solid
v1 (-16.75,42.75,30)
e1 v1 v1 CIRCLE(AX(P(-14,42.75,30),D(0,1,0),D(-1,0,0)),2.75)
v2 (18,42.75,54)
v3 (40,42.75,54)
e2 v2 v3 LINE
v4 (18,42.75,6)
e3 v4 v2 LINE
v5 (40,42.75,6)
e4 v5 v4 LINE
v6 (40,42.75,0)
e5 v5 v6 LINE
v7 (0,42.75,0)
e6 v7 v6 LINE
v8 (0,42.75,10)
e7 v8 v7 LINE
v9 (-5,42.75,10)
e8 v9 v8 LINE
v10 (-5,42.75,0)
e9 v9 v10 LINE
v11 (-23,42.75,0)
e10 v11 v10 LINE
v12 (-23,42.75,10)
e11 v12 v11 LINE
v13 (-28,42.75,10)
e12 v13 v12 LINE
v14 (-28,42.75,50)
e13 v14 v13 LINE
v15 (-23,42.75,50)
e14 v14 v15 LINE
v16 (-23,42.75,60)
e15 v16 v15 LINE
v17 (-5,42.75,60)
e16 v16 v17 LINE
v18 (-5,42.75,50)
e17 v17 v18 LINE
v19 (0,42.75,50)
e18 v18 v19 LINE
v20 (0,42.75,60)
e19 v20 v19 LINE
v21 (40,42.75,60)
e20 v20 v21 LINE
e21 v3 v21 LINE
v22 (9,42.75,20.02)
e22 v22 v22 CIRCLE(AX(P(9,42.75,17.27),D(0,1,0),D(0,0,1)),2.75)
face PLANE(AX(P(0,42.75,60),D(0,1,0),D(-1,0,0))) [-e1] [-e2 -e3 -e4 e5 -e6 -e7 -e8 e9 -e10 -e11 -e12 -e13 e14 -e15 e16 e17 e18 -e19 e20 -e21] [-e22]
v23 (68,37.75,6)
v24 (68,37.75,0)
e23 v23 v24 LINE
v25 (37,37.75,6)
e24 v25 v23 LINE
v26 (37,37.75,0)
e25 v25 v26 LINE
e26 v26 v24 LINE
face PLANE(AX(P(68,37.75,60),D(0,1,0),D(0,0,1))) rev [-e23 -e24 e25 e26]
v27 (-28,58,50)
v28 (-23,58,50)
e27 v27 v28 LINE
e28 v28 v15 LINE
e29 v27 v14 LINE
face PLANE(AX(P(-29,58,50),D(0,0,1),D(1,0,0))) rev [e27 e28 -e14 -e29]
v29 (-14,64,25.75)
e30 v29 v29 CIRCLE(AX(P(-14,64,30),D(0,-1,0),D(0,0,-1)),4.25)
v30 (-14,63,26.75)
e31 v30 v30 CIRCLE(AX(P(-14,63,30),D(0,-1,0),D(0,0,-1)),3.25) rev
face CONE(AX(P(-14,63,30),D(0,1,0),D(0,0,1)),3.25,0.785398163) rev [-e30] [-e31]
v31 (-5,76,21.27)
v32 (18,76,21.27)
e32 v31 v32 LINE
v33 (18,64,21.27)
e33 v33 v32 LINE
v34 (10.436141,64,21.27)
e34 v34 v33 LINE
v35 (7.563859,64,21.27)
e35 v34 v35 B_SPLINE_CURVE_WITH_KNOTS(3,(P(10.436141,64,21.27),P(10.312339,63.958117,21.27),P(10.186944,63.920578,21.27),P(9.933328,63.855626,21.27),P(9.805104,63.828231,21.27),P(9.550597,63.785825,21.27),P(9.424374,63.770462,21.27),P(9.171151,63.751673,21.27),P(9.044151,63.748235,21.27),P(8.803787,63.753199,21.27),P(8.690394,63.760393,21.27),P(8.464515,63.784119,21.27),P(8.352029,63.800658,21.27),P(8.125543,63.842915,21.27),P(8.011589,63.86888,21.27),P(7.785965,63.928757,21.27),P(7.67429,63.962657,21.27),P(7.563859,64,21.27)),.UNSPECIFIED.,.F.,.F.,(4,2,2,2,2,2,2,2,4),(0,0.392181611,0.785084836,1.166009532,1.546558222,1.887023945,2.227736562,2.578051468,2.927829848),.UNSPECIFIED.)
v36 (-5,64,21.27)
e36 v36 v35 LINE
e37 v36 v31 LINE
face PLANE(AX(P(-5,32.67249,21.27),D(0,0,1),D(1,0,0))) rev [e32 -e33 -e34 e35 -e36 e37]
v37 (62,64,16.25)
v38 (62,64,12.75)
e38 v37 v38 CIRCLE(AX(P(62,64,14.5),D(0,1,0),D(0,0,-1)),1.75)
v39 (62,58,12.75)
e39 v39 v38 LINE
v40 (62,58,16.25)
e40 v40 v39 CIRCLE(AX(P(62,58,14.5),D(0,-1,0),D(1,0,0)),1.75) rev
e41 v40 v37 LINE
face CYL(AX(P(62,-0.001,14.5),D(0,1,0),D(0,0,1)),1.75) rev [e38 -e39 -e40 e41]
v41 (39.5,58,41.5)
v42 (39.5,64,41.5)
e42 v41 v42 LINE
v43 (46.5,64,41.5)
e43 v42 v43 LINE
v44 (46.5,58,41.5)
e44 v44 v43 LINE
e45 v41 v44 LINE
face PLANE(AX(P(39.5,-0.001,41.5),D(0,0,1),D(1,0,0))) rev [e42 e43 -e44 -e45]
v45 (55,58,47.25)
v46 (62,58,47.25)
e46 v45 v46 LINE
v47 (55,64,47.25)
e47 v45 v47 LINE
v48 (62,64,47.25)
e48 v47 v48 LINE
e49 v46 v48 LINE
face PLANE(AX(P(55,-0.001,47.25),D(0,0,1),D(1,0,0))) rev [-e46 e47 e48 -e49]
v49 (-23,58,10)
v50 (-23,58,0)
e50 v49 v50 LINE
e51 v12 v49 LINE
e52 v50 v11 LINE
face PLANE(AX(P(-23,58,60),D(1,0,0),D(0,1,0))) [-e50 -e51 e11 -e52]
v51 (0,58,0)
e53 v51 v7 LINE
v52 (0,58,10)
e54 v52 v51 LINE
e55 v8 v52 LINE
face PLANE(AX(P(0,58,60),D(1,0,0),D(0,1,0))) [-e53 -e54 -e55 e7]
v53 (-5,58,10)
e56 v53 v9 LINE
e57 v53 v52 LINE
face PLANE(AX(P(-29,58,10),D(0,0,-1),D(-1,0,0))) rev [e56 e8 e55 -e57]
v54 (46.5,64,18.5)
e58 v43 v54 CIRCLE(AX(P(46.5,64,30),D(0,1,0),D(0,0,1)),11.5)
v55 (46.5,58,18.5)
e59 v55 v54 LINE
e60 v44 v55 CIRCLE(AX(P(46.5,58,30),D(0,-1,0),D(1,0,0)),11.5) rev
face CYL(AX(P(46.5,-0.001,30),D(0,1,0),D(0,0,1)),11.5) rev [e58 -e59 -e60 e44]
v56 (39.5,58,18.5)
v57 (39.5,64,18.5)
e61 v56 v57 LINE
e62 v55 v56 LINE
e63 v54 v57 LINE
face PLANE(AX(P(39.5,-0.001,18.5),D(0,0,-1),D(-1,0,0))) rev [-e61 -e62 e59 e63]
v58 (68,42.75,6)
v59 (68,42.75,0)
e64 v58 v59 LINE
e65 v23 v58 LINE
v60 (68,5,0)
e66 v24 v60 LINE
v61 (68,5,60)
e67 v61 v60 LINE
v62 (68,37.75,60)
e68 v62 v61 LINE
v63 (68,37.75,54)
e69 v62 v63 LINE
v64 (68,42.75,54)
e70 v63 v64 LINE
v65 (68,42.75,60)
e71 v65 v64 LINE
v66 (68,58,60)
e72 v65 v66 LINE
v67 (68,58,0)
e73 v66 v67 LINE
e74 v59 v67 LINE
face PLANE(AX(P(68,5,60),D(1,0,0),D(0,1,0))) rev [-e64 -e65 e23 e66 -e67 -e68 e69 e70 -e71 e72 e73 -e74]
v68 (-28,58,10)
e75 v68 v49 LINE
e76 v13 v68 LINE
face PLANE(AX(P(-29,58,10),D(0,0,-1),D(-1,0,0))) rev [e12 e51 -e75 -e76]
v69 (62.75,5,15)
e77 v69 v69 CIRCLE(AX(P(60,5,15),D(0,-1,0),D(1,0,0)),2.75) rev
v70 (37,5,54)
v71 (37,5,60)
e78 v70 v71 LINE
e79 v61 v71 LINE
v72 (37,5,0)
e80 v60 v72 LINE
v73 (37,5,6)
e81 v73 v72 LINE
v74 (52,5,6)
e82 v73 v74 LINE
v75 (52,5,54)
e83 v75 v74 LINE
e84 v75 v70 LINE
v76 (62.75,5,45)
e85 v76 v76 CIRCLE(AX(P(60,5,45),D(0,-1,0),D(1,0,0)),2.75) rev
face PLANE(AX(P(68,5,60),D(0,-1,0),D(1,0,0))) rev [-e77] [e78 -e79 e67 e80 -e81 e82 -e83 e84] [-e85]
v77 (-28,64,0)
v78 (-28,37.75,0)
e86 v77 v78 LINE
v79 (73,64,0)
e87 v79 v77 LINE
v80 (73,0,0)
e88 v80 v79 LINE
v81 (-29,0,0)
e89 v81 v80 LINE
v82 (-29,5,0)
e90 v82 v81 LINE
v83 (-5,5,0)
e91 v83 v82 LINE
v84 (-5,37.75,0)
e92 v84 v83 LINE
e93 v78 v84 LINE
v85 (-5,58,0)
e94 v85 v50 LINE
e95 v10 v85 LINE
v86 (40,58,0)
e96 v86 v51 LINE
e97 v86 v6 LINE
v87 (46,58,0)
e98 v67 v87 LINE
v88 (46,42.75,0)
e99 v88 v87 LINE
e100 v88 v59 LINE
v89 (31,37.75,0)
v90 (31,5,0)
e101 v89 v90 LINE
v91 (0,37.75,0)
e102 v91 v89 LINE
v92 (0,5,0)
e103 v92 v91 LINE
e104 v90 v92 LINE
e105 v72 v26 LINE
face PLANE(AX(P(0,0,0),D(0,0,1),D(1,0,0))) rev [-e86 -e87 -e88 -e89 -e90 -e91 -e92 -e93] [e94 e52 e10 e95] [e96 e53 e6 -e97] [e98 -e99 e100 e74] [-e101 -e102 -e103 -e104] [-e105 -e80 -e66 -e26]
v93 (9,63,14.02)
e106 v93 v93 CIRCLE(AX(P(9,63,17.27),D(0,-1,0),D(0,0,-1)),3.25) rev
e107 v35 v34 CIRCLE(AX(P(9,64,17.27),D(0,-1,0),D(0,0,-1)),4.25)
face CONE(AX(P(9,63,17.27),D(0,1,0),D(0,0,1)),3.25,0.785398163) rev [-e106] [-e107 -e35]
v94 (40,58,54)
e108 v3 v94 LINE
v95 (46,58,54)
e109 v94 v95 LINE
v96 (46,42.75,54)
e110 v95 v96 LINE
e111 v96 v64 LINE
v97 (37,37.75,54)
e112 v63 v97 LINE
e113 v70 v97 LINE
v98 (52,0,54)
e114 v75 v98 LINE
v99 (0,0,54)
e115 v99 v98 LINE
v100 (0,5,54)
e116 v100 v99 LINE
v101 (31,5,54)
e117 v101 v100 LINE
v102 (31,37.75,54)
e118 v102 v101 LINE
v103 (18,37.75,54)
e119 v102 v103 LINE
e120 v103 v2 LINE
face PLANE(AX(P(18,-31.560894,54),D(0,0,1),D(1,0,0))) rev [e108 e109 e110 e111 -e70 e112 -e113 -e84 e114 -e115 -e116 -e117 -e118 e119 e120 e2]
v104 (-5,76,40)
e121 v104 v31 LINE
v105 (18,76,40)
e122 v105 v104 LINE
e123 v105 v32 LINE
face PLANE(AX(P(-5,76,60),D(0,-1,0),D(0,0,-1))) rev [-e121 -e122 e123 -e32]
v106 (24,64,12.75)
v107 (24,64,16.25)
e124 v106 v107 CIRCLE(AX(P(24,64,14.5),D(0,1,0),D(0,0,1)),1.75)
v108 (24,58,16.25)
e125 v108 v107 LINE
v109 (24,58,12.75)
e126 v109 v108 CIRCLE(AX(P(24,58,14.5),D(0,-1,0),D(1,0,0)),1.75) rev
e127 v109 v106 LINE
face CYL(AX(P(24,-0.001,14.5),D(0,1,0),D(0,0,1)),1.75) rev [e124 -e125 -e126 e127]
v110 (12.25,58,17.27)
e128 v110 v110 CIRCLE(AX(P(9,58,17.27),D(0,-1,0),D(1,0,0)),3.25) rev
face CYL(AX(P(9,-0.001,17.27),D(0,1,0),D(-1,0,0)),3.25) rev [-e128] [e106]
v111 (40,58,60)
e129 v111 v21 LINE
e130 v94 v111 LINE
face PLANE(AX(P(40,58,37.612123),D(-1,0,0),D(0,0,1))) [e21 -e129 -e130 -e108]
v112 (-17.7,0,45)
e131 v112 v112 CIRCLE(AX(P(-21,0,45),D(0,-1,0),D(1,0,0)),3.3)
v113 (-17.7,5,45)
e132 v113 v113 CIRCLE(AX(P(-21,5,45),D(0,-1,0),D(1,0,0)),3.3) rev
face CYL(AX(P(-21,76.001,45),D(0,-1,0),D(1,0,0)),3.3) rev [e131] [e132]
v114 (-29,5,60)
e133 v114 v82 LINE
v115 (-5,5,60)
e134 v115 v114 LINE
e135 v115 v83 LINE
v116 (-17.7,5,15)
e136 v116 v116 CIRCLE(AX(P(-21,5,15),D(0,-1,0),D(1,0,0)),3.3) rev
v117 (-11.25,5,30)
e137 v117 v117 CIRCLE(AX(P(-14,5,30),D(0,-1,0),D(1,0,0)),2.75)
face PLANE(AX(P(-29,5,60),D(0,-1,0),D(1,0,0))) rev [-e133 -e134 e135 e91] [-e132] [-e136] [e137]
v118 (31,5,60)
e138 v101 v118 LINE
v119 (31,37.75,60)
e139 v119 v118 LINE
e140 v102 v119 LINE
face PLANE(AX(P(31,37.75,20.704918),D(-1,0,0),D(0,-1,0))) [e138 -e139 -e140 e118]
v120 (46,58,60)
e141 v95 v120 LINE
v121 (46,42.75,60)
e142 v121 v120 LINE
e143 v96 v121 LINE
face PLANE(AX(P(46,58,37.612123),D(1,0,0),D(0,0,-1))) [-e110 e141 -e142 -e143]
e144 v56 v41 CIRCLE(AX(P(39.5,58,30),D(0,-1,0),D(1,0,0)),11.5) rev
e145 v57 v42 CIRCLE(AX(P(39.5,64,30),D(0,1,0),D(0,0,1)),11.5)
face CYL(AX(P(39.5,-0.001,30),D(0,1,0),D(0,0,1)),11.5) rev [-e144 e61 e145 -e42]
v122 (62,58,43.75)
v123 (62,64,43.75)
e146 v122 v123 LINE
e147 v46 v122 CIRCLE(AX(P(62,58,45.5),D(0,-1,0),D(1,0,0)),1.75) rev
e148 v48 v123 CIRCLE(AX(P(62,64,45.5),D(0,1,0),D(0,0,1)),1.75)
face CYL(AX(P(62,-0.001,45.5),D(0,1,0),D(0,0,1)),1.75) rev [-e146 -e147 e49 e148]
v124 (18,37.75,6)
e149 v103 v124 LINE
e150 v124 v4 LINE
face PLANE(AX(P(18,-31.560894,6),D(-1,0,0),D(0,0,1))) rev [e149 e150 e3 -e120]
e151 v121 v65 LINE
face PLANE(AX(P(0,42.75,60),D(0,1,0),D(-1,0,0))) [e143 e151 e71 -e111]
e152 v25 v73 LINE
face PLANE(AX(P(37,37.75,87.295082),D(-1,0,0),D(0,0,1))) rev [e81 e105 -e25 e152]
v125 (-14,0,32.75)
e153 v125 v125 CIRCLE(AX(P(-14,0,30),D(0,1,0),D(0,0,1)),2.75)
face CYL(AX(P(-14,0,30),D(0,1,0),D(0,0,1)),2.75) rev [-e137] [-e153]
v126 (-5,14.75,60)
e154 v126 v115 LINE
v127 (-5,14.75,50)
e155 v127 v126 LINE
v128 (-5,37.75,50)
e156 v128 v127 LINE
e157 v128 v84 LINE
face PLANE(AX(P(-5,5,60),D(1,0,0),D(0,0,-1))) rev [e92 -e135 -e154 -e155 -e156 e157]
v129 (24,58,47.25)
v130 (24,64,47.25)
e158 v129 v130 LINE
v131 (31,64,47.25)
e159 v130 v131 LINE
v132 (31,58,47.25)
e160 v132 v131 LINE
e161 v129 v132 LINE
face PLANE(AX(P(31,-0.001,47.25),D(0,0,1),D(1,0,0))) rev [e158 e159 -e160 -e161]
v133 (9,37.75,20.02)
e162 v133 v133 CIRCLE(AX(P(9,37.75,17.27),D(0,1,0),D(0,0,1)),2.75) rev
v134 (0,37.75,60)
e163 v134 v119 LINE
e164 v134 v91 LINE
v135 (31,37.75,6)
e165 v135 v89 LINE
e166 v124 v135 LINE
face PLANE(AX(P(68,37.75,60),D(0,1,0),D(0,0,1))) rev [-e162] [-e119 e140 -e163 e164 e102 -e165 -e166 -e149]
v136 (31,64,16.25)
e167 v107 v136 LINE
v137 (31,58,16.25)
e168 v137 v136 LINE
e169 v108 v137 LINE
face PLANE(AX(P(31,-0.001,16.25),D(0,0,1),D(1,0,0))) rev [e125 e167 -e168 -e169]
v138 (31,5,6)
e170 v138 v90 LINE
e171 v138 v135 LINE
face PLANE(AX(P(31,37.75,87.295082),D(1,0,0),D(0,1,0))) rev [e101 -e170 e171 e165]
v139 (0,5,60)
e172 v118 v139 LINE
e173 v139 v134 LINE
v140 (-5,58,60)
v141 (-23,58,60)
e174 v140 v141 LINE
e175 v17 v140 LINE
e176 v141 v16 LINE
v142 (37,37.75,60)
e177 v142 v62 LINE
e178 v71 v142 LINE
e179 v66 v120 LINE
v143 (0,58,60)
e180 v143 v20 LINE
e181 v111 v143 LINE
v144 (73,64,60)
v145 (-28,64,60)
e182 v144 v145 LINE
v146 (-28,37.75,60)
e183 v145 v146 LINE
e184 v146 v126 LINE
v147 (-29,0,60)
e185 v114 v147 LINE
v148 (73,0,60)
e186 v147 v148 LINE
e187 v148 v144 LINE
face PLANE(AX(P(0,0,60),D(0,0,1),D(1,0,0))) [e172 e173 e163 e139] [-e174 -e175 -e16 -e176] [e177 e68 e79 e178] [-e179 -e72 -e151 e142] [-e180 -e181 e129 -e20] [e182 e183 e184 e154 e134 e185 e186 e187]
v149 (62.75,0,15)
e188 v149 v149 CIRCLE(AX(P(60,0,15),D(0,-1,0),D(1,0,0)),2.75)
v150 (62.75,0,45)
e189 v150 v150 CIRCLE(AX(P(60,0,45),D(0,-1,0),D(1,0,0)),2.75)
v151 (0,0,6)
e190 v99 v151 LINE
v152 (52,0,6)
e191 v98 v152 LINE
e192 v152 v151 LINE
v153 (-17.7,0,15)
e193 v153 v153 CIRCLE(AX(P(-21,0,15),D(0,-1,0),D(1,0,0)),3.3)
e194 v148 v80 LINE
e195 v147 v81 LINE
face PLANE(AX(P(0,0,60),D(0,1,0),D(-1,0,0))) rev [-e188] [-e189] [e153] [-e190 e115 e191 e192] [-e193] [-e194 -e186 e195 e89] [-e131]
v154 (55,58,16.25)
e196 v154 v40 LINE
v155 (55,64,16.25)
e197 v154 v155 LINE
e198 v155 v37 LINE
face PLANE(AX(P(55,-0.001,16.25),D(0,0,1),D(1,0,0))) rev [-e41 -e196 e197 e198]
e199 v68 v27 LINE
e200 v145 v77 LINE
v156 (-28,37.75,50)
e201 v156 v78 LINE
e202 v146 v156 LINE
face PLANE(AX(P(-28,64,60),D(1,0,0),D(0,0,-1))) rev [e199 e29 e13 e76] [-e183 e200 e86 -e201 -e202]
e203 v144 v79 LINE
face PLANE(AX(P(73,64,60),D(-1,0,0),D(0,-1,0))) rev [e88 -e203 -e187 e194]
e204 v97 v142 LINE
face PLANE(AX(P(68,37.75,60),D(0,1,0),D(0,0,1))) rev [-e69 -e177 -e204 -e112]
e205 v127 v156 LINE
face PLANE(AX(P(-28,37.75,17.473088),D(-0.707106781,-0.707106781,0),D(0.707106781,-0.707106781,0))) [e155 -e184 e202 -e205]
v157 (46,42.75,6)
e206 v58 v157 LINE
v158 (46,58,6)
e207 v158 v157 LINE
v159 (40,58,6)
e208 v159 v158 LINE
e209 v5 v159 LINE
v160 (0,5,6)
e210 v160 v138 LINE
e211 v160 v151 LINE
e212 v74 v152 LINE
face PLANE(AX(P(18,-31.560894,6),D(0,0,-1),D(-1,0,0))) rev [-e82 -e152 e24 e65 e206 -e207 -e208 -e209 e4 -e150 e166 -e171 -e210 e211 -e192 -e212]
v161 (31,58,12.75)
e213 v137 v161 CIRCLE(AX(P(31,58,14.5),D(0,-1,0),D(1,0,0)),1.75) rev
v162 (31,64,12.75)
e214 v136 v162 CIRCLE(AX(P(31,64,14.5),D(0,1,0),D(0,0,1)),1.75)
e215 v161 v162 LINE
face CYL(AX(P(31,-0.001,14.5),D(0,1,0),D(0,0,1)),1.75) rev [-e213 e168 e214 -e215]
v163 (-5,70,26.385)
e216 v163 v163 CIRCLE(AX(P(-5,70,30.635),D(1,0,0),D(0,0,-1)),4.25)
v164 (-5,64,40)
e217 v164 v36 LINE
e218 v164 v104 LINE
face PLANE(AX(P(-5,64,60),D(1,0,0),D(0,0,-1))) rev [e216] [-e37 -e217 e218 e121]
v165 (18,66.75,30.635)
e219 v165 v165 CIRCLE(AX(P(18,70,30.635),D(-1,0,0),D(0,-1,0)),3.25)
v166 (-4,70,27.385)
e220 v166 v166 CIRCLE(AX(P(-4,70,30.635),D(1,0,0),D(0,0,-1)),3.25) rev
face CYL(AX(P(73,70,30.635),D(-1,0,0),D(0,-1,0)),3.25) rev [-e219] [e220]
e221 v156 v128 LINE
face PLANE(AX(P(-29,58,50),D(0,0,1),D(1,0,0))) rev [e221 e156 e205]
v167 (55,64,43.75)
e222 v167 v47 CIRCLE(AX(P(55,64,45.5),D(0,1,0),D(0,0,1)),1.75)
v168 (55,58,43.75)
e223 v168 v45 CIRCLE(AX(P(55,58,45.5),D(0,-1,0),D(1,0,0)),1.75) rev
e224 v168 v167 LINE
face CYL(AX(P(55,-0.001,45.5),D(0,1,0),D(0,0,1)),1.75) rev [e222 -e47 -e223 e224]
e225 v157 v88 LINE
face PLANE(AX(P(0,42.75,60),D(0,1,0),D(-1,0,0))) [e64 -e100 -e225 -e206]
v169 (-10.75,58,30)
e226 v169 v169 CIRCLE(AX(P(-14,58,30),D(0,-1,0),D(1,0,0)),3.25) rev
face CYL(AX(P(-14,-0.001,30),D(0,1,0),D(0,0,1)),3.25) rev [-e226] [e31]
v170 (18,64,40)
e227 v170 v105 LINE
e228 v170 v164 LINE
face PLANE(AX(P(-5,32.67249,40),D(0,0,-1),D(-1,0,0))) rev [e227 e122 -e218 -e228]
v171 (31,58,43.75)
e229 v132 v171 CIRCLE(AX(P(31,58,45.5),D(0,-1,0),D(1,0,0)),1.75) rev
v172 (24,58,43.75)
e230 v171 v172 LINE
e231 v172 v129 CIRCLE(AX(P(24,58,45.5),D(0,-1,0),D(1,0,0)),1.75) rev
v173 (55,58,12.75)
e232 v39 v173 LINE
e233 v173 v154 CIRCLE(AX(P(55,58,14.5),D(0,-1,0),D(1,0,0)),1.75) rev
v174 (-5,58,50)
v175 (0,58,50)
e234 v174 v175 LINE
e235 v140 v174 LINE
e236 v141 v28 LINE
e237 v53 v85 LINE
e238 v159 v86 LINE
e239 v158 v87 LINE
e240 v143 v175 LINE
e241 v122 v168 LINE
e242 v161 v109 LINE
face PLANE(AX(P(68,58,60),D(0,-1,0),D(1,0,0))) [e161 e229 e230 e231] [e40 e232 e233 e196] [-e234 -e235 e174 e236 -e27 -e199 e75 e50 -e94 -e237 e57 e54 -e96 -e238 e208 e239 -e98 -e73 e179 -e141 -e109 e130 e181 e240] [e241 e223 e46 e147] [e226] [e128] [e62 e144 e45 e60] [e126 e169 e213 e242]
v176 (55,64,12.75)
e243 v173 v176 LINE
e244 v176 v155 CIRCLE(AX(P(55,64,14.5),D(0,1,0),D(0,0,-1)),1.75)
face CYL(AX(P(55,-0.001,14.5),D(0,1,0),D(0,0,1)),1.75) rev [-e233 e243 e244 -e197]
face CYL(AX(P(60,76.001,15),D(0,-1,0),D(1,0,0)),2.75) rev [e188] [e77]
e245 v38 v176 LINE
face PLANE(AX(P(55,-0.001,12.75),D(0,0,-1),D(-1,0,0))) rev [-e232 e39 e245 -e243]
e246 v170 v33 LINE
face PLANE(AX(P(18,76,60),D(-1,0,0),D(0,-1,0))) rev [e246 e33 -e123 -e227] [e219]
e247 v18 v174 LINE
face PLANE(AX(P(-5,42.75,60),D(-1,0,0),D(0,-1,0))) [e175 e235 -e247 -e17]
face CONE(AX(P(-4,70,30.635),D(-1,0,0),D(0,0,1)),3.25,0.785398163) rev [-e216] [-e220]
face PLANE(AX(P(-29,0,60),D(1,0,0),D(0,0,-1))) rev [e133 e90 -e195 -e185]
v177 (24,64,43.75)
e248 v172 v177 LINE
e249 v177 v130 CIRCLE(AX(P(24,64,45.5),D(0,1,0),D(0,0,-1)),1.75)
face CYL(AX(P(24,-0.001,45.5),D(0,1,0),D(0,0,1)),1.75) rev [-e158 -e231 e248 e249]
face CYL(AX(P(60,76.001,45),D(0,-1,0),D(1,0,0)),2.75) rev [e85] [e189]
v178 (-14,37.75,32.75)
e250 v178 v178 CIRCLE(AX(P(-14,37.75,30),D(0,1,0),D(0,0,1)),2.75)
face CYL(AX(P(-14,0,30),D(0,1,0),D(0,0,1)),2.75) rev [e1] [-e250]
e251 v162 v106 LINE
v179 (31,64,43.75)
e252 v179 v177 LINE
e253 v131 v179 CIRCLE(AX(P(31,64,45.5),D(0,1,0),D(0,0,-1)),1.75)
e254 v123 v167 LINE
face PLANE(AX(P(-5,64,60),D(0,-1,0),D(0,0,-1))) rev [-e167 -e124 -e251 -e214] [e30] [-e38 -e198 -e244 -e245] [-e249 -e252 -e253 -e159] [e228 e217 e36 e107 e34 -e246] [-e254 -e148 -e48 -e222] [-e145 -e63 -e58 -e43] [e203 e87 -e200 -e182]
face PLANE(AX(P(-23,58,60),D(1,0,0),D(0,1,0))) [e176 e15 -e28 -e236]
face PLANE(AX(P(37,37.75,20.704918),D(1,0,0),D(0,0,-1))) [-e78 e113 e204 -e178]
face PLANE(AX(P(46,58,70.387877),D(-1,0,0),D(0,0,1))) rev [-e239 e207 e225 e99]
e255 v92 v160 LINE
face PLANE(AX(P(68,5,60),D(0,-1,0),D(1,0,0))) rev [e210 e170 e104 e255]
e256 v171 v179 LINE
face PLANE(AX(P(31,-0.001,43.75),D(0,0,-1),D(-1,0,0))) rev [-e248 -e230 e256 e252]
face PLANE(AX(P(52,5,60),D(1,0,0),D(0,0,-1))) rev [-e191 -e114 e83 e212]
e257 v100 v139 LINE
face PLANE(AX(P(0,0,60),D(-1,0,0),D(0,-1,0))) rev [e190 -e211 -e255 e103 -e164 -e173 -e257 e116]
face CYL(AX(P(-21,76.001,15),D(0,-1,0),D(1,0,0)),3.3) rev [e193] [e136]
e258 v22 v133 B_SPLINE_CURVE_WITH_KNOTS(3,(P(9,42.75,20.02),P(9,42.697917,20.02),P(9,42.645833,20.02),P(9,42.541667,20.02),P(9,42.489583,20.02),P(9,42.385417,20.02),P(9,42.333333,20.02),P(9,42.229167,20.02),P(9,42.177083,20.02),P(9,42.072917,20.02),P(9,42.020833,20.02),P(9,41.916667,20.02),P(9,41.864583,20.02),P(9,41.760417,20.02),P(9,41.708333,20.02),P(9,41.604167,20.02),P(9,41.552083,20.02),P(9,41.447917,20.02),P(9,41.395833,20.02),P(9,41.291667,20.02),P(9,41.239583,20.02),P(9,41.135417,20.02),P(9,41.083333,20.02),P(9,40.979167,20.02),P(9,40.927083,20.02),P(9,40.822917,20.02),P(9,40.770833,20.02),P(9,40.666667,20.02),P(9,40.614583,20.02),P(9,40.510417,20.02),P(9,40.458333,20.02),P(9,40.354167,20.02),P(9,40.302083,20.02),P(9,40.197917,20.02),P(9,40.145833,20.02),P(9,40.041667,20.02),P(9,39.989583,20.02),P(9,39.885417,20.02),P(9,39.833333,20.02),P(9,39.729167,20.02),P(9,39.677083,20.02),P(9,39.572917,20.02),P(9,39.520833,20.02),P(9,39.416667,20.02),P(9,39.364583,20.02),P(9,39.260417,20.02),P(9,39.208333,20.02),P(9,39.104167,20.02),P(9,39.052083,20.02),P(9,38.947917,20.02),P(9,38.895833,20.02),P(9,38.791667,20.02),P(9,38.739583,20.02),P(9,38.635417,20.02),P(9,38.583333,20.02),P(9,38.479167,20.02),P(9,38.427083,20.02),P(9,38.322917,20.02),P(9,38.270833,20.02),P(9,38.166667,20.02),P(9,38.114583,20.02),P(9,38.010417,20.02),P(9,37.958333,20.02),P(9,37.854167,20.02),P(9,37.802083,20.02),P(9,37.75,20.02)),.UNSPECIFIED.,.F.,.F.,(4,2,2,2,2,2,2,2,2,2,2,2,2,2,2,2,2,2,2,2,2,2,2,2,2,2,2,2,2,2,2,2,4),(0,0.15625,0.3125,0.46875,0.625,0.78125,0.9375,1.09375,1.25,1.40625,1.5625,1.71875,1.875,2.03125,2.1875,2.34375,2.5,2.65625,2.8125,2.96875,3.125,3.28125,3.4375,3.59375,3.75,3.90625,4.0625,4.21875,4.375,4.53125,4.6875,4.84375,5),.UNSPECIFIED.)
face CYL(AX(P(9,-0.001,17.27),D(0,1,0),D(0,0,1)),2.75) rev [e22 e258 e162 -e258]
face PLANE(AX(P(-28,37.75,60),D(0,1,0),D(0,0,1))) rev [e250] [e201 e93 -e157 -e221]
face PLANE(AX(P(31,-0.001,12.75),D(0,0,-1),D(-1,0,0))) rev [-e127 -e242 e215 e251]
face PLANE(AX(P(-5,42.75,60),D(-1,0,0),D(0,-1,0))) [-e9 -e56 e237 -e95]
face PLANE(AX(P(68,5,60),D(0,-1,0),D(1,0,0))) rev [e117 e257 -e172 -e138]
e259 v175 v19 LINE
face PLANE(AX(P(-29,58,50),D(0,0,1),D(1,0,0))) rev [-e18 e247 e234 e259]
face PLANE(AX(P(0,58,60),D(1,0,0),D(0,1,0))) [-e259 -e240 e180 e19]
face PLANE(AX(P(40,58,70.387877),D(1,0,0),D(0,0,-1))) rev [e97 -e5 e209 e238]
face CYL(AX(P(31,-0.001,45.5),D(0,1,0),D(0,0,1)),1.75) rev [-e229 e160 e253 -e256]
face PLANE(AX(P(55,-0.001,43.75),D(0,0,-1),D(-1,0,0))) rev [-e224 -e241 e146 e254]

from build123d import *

# Parameters (mm, degrees)
SKETCH1_W           = 68
SKETCH1_H           = 15.25
SKETCH1_W_2         = 18
BOSS_EXTRUDE1_DEPTH = 60
SKETCH2_W           = 40
SKETCH2_H           = 15.25
CUT_EXTRUDE1_DEPTH  = 122.264174429
CUT_EXTRUDE2_REACH  = 116.127
CUT_EXTRUDE3_REACH  = 123.264
SKETCH5_R           = 3.25
CUT_EXTRUDE4_REACH  = 105.714
SKETCH6_R           = 2.75
SKETCH7_R           = 2.75
CUT_EXTRUDE5_DEPTH  = 115.127122105
CUT_EXTRUDE6_REACH  = 116.127
SKETCH8_R           = 3.25
SKETCH9_W           = 23
SKETCH9_H           = 21.27
SKETCH9_H_2         = 20
CUT_EXTRUDE7_DEPTH  = 12
CHAMFER1_SIZE       = 1
CUT_EXTRUDE8_REACH  = 123.264
SKETCH10_R          = 3.3
SKETCH10_R_2        = 2.75
SKETCH11_R          = 3.25
CUT_EXTRUDE9_DEPTH  = 125.338248339
CHAMFER2_SIZE       = 1
SKETCH12_W          = 50
SKETCH12_H          = 48
CUT_EXTRUDE10_DEPTH = 5
SKETCH13_W          = 52
SKETCH13_H          = 6
BOSS_EXTRUDE2_DEPTH = 5
SKETCH14_W          = 6
SKETCH14_H          = 32.75
BOSS_EXTRUDE3_DEPTH = 6
SKETCH15_W          = 6
SKETCH15_H          = 15.25
BOSS_EXTRUDE4_DEPTH = 6
BOSS_EXTRUDE5_DEPTH = 10


with BuildPart() as part:
    # Sketch1 → Boss-Extrude1 (new body)
    with BuildSketch(Plane.XY):
        Polygon((0, 0), (-29, 0), (-29, 5), (-5, 5), (-5, 37.75), (-28, 37.75), (-28, 64), (-5, 64), (-5, 76), (18, 76), (18, 64), (73, 64), (73, 0), (52, 0), (52, 5), (68, 5), (68, 37.75), (0, 37.75), align=None)
        with Locations((34, 50.375)):
            Rectangle(SKETCH1_W, SKETCH1_H, mode=Mode.SUBTRACT)
        with Locations((-14, 50.375)):
            Rectangle(SKETCH1_W_2, SKETCH1_H, mode=Mode.SUBTRACT)
    extrude(amount=BOSS_EXTRUDE1_DEPTH)

    # Sketch2 → Cut-Extrude1 (cut, through all)
    with BuildSketch(Plane(origin=(0, 0, 0), x_dir=(0, 0, -1), z_dir=(1, 0, 0))):
        with Locations((-30, 50.375)):
            Rectangle(SKETCH2_W, SKETCH2_H)
    extrude(amount=-CUT_EXTRUDE1_DEPTH, mode=Mode.SUBTRACT)

    # Sketch3 → Cut-Extrude2 (cut, up to next)
    with BuildSketch(Plane(origin=(0, 64, 0), x_dir=(1, 0, 0), z_dir=(0, 1, 0)), mode=Mode.PRIVATE) as cut_extrude2_sk1:
        with BuildLine():
            Line((39.5, -18.5), (46.5, -18.5))
            ThreePointArc((46.5, -18.5), (58, -30), (46.5, -41.5))
            Line((46.5, -41.5), (39.5, -41.5))
            ThreePointArc((39.5, -41.5), (28, -30), (39.5, -18.5))
        make_face()
    cut_extrude2_tool1 = extrude(cut_extrude2_sk1.sketch, amount=-CUT_EXTRUDE2_REACH, mode=Mode.PRIVATE) & part.part
    # Sketch3 → Cut-Extrude2 (cut, up to next)
    with BuildSketch(Plane(origin=(0, 64, 0), x_dir=(1, 0, 0), z_dir=(0, 1, 0)), mode=Mode.PRIVATE) as cut_extrude2_sk2:
        with BuildLine():
            Line((31, -16.25), (24, -16.25))
            ThreePointArc((24, -16.25), (22.25, -14.5), (24, -12.75))
            Line((24, -12.75), (31, -12.75))
            ThreePointArc((31, -12.75), (32.75, -14.5), (31, -16.25))
        make_face()
    cut_extrude2_tool2 = extrude(cut_extrude2_sk2.sketch, amount=-CUT_EXTRUDE2_REACH, mode=Mode.PRIVATE) & part.part
    # Sketch3 → Cut-Extrude2 (cut, up to next)
    with BuildSketch(Plane(origin=(0, 64, 0), x_dir=(1, 0, 0), z_dir=(0, 1, 0)), mode=Mode.PRIVATE) as cut_extrude2_sk3:
        with BuildLine():
            Line((55, -16.25), (62, -16.25))
            ThreePointArc((62, -16.25), (63.75, -14.5), (62, -12.75))
            Line((62, -12.75), (55, -12.75))
            ThreePointArc((55, -12.75), (53.25, -14.5), (55, -16.25))
        make_face()
    cut_extrude2_tool3 = extrude(cut_extrude2_sk3.sketch, amount=-CUT_EXTRUDE2_REACH, mode=Mode.PRIVATE) & part.part
    # Sketch3 → Cut-Extrude2 (cut, up to next)
    with BuildSketch(Plane(origin=(0, 64, 0), x_dir=(1, 0, 0), z_dir=(0, 1, 0)), mode=Mode.PRIVATE) as cut_extrude2_sk4:
        with BuildLine():
            Line((31, -43.75), (24, -43.75))
            ThreePointArc((24, -43.75), (22.25, -45.5), (24, -47.25))
            Line((24, -47.25), (31, -47.25))
            ThreePointArc((31, -47.25), (32.75, -45.5), (31, -43.75))
        make_face()
    cut_extrude2_tool4 = extrude(cut_extrude2_sk4.sketch, amount=-CUT_EXTRUDE2_REACH, mode=Mode.PRIVATE) & part.part
    # Sketch3 → Cut-Extrude2 (cut, up to next)
    with BuildSketch(Plane(origin=(0, 64, 0), x_dir=(1, 0, 0), z_dir=(0, 1, 0)), mode=Mode.PRIVATE) as cut_extrude2_sk5:
        with BuildLine():
            Line((55, -43.75), (62, -43.75))
            ThreePointArc((62, -43.75), (63.75, -45.5), (62, -47.25))
            Line((62, -47.25), (55, -47.25))
            ThreePointArc((55, -47.25), (53.25, -45.5), (55, -43.75))
        make_face()
    cut_extrude2_tool5 = extrude(cut_extrude2_sk5.sketch, amount=-CUT_EXTRUDE2_REACH, mode=Mode.PRIVATE) & part.part
    add(cut_extrude2_tool1.solids().sort_by_distance((43, 64, 30))[0], mode=Mode.SUBTRACT)
    add(cut_extrude2_tool2.solids().sort_by_distance((27.5, 64, 14.5))[0], mode=Mode.SUBTRACT)
    add(cut_extrude2_tool3.solids().sort_by_distance((58.5, 64, 14.5))[0], mode=Mode.SUBTRACT)
    add(cut_extrude2_tool4.solids().sort_by_distance((27.5, 64, 45.5))[0], mode=Mode.SUBTRACT)
    add(cut_extrude2_tool5.solids().sort_by_distance((58.5, 64, 45.5))[0], mode=Mode.SUBTRACT)

    # Sketch5 → Cut-Extrude3 (cut, up to next)
    with BuildSketch(Plane(origin=(0, 76, 0), x_dir=(1, 0, 0), z_dir=(0, 1, 0)), mode=Mode.PRIVATE) as cut_extrude3_sk1:
        with Locations(Location((9, -17.27, 0), (0, 0, 180))):
            Circle(SKETCH5_R)
    cut_extrude3_tool1 = extrude(cut_extrude3_sk1.sketch, amount=-CUT_EXTRUDE3_REACH, mode=Mode.PRIVATE) & part.part
    add(cut_extrude3_tool1.solids().sort_by_distance((9, 76, 17.27))[0], mode=Mode.SUBTRACT)

    # Sketch6 → Cut-Extrude4 (cut, up to next)
    with BuildSketch(Plane(origin=(0, 42.75, 0), x_dir=(1, 0, 0), z_dir=(0, 1, 0)), mode=Mode.PRIVATE) as cut_extrude4_sk1:
        with Locations(Location((9, -17.27, 0), (0, 0, 270))):
            Circle(SKETCH6_R)
    cut_extrude4_tool1 = extrude(cut_extrude4_sk1.sketch, amount=-CUT_EXTRUDE4_REACH, mode=Mode.PRIVATE) & part.part
    add(cut_extrude4_tool1.solids().sort_by_distance((9, 42.75, 17.27))[0], mode=Mode.SUBTRACT)

    # Sketch7 → Cut-Extrude5 (cut, through all)
    with BuildSketch(Plane(origin=(0, 64, 0), x_dir=(1, 0, 0), z_dir=(0, 1, 0))):
        with Locations(Location((-14, -30, 0), (0, 0, 270))):
            Circle(SKETCH7_R)
    extrude(amount=-CUT_EXTRUDE5_DEPTH, mode=Mode.SUBTRACT)

    # Sketch8 → Cut-Extrude6 (cut, up to next)
    with BuildSketch(Plane(origin=(0, 64, 0), x_dir=(1, 0, 0), z_dir=(0, 1, 0)), mode=Mode.PRIVATE) as cut_extrude6_sk1:
        with Locations(Location((-14, -30, 0), (0, 0, 270))):
            Circle(SKETCH8_R)
    cut_extrude6_tool1 = extrude(cut_extrude6_sk1.sketch, amount=-CUT_EXTRUDE6_REACH, mode=Mode.PRIVATE) & part.part
    add(cut_extrude6_tool1.solids().sort_by_distance((-14, 64, 30))[0], mode=Mode.SUBTRACT)

    # Sketch9 → Cut-Extrude7 (cut)
    with BuildSketch(Plane(origin=(0, 76, 0), x_dir=(1, 0, 0), z_dir=(0, 1, 0))):
        with Locations((6.5, -10.635)):
            Rectangle(SKETCH9_W, SKETCH9_H)
        with Locations((6.5, -50)):
            Rectangle(SKETCH9_W, SKETCH9_H_2)
    extrude(amount=-CUT_EXTRUDE7_DEPTH, mode=Mode.SUBTRACT)

    # Chamfer1
    # the kernel refuses this chamfer: 1 mm, written as the material it takes off along each edge
    with BuildSketch(Plane(origin=(-14, 64, 30), x_dir=(0, 0, 1), z_dir=(-1, 0, 0))) as chamfer1_piece_1:
        Polygon((3.25 + CHAMFER1_SIZE, 0), (3.25, -CHAMFER1_SIZE), (3.25, 0), align=None)
    revolve(axis=Axis((-14, 64, 30), (0, 1, 0)), mode=Mode.SUBTRACT)
    with BuildSketch(Plane(origin=(9, 64, 17.27), x_dir=(-1, 0, 0), z_dir=(0, 0, -1))) as chamfer1_piece_2_section:
        Polygon((3.25 + CHAMFER1_SIZE, 0), (3.25, -CHAMFER1_SIZE), (3.25, 0), align=None)
    chamfer1_piece_2 = revolve(axis=Axis((9, 64, 17.27), (0, 1, 0)), mode=Mode.PRIVATE)
    chamfer1_piece_2 = split(chamfer1_piece_2, bisect_by=Plane(origin=(12.733674615, 63.516325385, 21.27), z_dir=(0, 0, -1)), keep=Keep.TOP, mode=Mode.PRIVATE)
    add(chamfer1_piece_2, mode=Mode.SUBTRACT)

    # Sketch10 → Cut-Extrude8 (cut, up to next)
    with BuildSketch(Plane.XZ, mode=Mode.PRIVATE) as cut_extrude8_sk1:
        with Locations((-21, 45)):
            Circle(SKETCH10_R)
    cut_extrude8_tool1 = extrude(cut_extrude8_sk1.sketch, amount=-CUT_EXTRUDE8_REACH, mode=Mode.PRIVATE) & part.part
    # Sketch10 → Cut-Extrude8 (cut, up to next)
    with BuildSketch(Plane.XZ, mode=Mode.PRIVATE) as cut_extrude8_sk2:
        with Locations((-21, 15)):
            Circle(SKETCH10_R)
    cut_extrude8_tool2 = extrude(cut_extrude8_sk2.sketch, amount=-CUT_EXTRUDE8_REACH, mode=Mode.PRIVATE) & part.part
    # Sketch10 → Cut-Extrude8 (cut, up to next)
    with BuildSketch(Plane.XZ, mode=Mode.PRIVATE) as cut_extrude8_sk3:
        with Locations((60, 15)):
            Circle(SKETCH10_R_2)
    cut_extrude8_tool3 = extrude(cut_extrude8_sk3.sketch, amount=-CUT_EXTRUDE8_REACH, mode=Mode.PRIVATE) & part.part
    # Sketch10 → Cut-Extrude8 (cut, up to next)
    with BuildSketch(Plane.XZ, mode=Mode.PRIVATE) as cut_extrude8_sk4:
        with Locations((60, 45)):
            Circle(SKETCH10_R_2)
    cut_extrude8_tool4 = extrude(cut_extrude8_sk4.sketch, amount=-CUT_EXTRUDE8_REACH, mode=Mode.PRIVATE) & part.part
    add(cut_extrude8_tool1.solids().sort_by_distance((-21, 0, 45))[0], mode=Mode.SUBTRACT)
    add(cut_extrude8_tool2.solids().sort_by_distance((-21, 0, 15))[0], mode=Mode.SUBTRACT)
    add(cut_extrude8_tool3.solids().sort_by_distance((60, 0, 15))[0], mode=Mode.SUBTRACT)
    add(cut_extrude8_tool4.solids().sort_by_distance((60, 0, 45))[0], mode=Mode.SUBTRACT)

    # Sketch11 → Cut-Extrude9 (cut, through all)
    with BuildSketch(Plane.ZY.offset(5)):
        with Locations(Location((30.635, 70, 0), (0, 0, 270))):
            Circle(SKETCH11_R)
    extrude(amount=-CUT_EXTRUDE9_DEPTH, mode=Mode.SUBTRACT)

    # Chamfer2
    chamfer2_edges = [part.edges().sort_by_distance(p)[0] for p in [
        (-5, 73.25, 30.635),
    ]]
    chamfer(chamfer2_edges, length=CHAMFER2_SIZE)

    # Sketch12 → Cut-Extrude10 (cut)
    with BuildSketch(Plane(origin=(0, 42.75, 0), x_dir=(1, 0, 0), z_dir=(0, 1, 0))):
        with Locations((43, -30)):
            Rectangle(SKETCH12_W, SKETCH12_H)
    extrude(amount=-CUT_EXTRUDE10_DEPTH, mode=Mode.SUBTRACT)

    # Sketch13 → Boss-Extrude2 (add)
    with BuildSketch(Plane.XZ):
        with Locations((26, 57)):
            Rectangle(SKETCH13_W, SKETCH13_H)
        with Locations((26, 3)):
            Rectangle(SKETCH13_W, SKETCH13_H)
    extrude(amount=-BOSS_EXTRUDE2_DEPTH)

    # Sketch14 → Boss-Extrude3 (add)
    with BuildSketch(Plane.XY.offset(60)):
        with Locations((34, 21.375)):
            Rectangle(SKETCH14_W, SKETCH14_H)
    boss_extrude3 = extrude(amount=-BOSS_EXTRUDE3_DEPTH)

    # Sketch15 → Boss-Extrude4 (add)
    with BuildSketch(Plane.XY.offset(60)):
        with Locations((43, 50.375)):
            Rectangle(SKETCH15_W, SKETCH15_H)
    boss_extrude4 = extrude(amount=-BOSS_EXTRUDE4_DEPTH)

    # Mirror1: Boss-Extrude3, Boss-Extrude4 across plane
    add(boss_extrude3.mirror(Plane.XY.offset(30)))
    add(boss_extrude4.mirror(Plane.XY.offset(30)))

    # Sketch16 → Boss-Extrude5 (add)
    with BuildSketch(Plane.XY.offset(60)):
        Polygon((-28, 37.75), (-5, 14.75), (-5, 37.75), align=None)
    extrude(amount=-BOSS_EXTRUDE5_DEPTH)


solid = part.part
